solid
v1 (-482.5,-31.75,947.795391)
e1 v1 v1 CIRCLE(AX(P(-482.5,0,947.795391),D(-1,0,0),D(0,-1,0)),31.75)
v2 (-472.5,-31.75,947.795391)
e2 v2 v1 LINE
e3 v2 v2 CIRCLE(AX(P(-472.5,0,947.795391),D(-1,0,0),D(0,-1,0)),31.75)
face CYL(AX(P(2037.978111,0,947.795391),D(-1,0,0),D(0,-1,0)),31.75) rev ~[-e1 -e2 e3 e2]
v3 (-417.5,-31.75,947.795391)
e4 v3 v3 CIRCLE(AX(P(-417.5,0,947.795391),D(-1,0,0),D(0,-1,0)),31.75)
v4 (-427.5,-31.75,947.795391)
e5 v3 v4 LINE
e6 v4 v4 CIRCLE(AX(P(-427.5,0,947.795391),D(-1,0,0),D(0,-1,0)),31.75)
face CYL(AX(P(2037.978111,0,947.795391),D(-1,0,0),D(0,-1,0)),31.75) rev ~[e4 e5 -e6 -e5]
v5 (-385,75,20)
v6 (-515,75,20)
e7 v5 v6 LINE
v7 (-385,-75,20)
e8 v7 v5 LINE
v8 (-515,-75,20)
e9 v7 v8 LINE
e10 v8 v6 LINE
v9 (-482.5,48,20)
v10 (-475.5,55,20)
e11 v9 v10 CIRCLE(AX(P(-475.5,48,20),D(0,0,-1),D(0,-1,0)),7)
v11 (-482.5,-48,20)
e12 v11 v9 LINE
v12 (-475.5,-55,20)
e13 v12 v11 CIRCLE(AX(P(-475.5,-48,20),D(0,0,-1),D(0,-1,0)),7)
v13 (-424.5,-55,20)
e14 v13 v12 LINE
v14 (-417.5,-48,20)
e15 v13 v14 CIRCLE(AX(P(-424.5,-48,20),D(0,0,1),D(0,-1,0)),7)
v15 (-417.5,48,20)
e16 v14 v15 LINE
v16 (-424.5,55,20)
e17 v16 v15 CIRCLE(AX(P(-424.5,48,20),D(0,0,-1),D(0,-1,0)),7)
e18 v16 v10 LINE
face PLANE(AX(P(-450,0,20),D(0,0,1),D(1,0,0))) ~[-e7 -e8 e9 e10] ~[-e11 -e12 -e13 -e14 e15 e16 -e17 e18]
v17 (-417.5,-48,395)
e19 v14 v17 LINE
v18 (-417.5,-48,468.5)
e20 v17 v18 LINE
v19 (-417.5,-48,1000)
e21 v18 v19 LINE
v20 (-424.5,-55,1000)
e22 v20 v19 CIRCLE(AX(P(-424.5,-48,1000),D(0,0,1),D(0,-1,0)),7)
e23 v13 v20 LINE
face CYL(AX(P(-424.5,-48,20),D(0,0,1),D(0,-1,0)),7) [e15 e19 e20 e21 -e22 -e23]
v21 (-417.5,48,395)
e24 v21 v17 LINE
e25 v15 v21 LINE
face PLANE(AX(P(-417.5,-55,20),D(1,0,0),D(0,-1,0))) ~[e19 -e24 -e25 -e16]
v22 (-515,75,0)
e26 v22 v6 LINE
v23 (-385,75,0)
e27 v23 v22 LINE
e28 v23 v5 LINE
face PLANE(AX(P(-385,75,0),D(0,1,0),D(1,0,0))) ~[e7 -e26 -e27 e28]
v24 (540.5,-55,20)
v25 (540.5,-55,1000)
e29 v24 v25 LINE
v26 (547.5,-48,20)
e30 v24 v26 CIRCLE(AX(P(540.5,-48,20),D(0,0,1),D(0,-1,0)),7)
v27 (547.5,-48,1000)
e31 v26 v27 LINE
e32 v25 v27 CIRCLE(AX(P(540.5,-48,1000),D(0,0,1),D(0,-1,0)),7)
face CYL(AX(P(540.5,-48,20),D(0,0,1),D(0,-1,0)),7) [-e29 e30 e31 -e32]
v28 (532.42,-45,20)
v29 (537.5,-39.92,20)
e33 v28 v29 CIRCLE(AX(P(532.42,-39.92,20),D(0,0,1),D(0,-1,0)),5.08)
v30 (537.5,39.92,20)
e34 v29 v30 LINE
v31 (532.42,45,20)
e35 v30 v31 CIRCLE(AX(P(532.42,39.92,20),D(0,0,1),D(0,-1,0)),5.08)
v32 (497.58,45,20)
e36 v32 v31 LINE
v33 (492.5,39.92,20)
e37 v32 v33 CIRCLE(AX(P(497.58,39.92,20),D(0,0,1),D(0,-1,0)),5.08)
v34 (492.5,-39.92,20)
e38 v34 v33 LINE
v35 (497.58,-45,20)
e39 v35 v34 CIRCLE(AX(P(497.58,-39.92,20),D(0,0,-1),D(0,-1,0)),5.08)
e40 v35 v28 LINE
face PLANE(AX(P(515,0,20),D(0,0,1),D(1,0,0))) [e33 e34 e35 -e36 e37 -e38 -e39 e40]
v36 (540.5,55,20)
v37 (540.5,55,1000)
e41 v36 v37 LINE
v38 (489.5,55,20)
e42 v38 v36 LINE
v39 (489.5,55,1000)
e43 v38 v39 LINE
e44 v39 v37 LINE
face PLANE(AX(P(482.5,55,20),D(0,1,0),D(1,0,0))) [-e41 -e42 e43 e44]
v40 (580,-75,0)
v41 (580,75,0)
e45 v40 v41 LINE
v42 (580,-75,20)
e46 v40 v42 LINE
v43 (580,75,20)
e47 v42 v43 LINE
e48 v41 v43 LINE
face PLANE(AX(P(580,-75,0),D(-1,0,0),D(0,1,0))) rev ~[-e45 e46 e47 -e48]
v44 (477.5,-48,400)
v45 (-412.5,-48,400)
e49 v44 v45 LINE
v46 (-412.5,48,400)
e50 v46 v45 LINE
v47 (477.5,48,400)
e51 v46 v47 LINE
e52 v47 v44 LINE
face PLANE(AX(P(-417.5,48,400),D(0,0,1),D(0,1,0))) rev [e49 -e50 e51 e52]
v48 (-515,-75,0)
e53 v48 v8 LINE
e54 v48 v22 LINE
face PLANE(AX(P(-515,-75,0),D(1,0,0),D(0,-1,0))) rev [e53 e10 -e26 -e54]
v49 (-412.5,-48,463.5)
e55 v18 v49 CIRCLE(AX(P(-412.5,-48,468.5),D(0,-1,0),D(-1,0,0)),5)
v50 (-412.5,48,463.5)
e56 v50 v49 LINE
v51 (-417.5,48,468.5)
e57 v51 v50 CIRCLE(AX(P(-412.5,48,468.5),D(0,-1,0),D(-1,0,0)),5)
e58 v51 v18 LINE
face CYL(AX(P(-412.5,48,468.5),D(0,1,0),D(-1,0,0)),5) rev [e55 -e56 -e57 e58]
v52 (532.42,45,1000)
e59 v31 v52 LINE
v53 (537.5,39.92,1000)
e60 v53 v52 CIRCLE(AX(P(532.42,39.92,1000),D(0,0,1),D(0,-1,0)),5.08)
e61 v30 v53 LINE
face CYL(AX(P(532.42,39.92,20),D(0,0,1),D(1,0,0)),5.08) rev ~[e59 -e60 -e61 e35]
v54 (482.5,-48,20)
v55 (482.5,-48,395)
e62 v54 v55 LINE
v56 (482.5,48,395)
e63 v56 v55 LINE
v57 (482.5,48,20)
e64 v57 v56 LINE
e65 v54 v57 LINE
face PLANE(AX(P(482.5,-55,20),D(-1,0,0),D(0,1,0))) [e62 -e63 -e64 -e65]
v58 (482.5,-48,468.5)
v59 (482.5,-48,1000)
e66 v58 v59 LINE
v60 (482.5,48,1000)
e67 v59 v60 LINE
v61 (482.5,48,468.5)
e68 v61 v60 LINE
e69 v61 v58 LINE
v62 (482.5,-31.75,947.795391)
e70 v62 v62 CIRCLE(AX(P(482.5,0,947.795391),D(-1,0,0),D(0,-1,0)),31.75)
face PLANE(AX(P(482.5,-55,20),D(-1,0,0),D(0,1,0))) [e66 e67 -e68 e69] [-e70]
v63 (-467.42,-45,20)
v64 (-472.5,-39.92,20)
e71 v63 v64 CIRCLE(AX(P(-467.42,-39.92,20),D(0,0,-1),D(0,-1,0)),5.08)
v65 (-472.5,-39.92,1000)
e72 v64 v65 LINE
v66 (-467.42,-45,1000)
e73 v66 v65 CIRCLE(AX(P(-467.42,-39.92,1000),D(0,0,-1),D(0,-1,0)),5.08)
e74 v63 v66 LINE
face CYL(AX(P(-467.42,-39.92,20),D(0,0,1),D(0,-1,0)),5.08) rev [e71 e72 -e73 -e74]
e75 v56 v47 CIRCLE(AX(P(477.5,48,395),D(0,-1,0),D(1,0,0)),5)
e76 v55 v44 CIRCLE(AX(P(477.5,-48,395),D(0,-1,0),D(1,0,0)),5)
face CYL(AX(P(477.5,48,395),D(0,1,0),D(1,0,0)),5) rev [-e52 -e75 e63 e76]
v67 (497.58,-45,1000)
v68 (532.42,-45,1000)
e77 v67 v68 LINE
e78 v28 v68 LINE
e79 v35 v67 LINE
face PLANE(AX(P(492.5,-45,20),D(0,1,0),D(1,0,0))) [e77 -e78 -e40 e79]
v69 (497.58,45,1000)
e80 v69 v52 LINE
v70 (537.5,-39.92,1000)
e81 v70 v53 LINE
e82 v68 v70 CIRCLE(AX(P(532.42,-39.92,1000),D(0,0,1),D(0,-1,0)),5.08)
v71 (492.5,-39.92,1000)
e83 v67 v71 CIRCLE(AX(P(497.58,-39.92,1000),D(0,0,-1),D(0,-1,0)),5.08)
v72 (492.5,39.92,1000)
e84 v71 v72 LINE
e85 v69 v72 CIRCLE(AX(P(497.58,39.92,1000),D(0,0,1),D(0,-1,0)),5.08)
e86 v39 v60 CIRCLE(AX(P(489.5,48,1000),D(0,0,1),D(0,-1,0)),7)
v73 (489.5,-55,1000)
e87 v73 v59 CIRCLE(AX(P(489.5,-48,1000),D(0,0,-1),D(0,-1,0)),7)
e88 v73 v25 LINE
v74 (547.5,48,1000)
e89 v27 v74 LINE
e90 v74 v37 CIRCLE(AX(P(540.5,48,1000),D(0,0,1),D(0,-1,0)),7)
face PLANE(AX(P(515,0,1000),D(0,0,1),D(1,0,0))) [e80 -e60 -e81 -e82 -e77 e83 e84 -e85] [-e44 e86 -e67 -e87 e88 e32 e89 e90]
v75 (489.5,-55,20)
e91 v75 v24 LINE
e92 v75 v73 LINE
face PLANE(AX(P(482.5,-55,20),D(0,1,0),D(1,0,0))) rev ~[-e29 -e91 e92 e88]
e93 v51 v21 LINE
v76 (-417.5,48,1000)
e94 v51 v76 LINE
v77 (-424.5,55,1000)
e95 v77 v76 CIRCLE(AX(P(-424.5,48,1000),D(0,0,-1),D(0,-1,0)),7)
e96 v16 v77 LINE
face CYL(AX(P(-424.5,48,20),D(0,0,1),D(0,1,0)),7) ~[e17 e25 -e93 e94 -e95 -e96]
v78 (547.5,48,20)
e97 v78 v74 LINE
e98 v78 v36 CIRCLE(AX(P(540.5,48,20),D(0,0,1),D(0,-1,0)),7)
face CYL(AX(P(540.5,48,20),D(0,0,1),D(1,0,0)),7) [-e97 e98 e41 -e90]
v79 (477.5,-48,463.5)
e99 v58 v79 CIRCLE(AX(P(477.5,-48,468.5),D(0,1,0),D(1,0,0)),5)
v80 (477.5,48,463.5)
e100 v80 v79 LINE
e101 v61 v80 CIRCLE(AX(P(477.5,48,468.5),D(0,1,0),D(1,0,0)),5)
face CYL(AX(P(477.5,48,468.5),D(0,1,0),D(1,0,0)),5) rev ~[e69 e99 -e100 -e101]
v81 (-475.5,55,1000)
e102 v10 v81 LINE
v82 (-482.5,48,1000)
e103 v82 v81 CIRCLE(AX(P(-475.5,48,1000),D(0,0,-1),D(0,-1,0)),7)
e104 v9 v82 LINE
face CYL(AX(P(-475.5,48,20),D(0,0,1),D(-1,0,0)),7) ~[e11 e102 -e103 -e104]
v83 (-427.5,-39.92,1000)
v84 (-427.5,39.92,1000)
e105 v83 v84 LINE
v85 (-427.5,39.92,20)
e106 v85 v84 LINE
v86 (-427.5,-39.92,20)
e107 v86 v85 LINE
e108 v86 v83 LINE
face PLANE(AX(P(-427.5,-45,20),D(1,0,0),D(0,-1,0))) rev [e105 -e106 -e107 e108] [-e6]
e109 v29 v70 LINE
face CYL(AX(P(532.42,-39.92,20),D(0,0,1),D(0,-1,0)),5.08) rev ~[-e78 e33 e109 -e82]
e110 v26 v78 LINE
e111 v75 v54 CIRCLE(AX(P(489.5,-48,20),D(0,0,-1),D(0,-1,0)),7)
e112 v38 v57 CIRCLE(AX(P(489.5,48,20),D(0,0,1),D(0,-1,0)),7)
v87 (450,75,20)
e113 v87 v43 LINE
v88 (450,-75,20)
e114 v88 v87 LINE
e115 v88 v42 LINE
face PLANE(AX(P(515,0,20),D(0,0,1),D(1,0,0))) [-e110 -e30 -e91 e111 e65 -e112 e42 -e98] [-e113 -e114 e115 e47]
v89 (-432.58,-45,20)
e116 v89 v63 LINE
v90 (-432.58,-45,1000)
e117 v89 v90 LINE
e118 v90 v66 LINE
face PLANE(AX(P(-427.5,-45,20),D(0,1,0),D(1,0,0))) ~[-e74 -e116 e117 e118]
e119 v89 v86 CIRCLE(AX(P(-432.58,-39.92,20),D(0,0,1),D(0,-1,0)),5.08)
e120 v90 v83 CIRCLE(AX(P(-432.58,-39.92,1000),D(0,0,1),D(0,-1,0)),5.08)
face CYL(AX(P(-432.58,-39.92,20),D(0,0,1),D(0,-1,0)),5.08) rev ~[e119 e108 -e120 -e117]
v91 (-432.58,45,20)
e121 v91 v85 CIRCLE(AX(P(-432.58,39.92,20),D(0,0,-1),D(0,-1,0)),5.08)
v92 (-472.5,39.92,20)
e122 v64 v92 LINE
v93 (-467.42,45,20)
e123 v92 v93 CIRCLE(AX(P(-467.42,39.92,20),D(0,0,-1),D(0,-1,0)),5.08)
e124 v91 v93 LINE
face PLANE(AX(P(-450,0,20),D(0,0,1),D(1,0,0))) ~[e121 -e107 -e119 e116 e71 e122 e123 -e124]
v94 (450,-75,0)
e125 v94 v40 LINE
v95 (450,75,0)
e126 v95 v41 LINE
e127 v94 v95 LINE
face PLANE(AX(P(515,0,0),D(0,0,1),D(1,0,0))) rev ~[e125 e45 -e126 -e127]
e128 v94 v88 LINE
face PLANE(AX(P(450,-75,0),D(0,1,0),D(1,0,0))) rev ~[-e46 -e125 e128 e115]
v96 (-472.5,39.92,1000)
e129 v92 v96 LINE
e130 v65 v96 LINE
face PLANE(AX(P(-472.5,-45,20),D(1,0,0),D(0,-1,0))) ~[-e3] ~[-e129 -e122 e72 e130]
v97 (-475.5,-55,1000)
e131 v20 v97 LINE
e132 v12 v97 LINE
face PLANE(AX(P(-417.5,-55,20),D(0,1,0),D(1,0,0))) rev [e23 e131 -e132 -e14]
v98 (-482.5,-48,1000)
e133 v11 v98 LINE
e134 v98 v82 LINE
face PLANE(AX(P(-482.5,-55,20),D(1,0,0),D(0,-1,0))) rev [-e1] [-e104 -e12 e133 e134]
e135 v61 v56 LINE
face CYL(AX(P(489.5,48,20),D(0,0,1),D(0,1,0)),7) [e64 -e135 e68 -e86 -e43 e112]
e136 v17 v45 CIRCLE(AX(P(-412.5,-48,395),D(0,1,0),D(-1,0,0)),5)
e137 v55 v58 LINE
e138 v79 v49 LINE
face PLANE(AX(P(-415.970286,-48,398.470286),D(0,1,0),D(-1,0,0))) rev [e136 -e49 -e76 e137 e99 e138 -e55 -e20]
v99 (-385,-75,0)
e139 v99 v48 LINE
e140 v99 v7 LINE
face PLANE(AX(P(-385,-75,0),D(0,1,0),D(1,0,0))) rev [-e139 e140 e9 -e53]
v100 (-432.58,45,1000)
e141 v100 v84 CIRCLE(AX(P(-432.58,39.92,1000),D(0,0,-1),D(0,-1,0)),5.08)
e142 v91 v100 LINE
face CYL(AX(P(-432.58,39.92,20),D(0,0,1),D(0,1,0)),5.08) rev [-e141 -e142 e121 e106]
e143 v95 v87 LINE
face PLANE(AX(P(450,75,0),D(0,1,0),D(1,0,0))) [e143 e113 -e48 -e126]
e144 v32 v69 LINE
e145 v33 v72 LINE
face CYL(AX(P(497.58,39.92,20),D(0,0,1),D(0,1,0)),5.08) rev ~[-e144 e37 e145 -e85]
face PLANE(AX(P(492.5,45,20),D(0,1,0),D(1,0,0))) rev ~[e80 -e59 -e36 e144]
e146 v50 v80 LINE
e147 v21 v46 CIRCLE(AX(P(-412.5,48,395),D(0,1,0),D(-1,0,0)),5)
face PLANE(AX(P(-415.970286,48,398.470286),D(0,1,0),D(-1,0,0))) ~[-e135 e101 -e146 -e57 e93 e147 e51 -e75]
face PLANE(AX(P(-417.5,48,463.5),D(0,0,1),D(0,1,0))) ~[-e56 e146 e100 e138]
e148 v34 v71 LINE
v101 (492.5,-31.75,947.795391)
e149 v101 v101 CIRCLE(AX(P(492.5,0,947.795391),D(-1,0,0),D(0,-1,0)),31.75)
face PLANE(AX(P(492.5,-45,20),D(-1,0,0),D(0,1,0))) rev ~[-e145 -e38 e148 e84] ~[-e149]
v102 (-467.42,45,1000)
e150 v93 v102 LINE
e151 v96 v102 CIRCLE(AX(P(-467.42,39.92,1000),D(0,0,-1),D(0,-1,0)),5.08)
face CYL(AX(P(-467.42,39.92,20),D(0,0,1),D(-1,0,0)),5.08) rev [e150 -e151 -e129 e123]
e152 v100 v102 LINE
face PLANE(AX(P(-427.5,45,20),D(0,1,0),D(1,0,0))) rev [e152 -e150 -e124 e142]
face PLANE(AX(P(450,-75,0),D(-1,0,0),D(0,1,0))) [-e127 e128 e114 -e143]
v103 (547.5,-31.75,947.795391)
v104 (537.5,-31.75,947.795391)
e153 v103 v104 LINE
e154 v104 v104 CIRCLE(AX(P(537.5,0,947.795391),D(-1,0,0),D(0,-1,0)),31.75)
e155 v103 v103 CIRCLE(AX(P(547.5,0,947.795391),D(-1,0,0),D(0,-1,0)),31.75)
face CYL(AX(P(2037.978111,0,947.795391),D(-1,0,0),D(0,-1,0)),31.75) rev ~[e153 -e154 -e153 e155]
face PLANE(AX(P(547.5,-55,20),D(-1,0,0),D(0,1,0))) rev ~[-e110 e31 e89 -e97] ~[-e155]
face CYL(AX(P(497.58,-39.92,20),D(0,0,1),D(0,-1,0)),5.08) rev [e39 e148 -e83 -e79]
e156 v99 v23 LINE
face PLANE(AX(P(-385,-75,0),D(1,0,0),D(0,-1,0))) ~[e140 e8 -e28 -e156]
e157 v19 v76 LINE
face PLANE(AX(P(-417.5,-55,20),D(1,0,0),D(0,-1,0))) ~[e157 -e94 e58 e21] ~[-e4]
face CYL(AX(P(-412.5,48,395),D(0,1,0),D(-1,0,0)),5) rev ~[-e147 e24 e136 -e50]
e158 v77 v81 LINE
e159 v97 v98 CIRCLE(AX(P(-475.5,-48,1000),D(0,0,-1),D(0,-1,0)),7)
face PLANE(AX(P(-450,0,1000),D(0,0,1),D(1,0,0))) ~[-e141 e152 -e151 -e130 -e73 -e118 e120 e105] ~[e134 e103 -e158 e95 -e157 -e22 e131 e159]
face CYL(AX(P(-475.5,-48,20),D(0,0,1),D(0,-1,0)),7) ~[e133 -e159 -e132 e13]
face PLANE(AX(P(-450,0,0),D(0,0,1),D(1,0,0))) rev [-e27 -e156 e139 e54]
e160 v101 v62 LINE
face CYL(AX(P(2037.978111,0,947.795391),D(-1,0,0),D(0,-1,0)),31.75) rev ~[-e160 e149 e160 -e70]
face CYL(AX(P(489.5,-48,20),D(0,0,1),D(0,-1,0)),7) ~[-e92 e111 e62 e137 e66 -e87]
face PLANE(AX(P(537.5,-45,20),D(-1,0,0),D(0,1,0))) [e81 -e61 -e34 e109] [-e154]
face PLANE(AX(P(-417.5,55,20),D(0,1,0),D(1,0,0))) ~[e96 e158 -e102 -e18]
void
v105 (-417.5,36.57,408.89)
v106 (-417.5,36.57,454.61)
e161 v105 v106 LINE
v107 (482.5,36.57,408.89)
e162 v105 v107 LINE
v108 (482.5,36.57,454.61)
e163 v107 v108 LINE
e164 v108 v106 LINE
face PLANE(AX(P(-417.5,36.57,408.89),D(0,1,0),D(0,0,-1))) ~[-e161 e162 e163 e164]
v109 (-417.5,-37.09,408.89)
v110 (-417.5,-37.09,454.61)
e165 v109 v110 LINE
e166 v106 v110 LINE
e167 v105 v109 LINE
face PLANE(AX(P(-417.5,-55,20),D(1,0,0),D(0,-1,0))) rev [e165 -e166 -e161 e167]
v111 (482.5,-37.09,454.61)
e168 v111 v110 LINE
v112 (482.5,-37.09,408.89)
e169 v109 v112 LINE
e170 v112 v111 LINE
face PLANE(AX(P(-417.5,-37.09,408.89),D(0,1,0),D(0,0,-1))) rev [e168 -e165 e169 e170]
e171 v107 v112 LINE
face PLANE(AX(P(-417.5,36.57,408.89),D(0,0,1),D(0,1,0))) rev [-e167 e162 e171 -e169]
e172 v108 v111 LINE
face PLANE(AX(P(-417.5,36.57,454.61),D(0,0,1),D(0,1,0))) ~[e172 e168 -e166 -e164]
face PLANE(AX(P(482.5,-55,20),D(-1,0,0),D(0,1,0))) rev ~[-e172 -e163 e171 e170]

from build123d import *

# Parameters (mm, degrees)
F0_W        = 130
F0_H        = 150
F1_DEPTH    = 20
F2_W        = 65
F2_H        = 110
F2_W_2      = 45
F2_H_2      = 90
F3_DEPTH    = 980
F4_R        = 7
F5_R        = 5.08
F6_W        = 96
F6_H        = 63.5
F6_W_2      = 73.66
F6_H_2      = 45.72
F7_DEPTH    = 450
F8_T1_DEPTH = 96
F9_T1_DEPTH = 96
F13_D       = 63.5


# Not quite as in the source:
# - a fillet or chamfer that OpenCascade refuses, or shapes differently, is made with other operations: its cross-section is extruded or revolved along the edge and cut away or added


with BuildPart() as f1:
    # F0 (on Top) → F1 (new body)
    with BuildSketch(Plane.XY):
        with Locations((515, 0)):
            Rectangle(F0_W, F0_H)
    extrude(amount=F1_DEPTH)

    # F2 (on face) → F3 (join)
    with BuildSketch(Plane.XY.offset(20)):
        with Locations((515, 0)):
            Rectangle(F2_W, F2_H)
        with Locations((515, 0)):
            Rectangle(F2_W_2, F2_H_2, mode=Mode.SUBTRACT)
    extrude(amount=F3_DEPTH)

    # F4
    f4_edges = [f1.edges().sort_by_distance(p)[0] for p in [
        (547.5, -55, 510),
        (482.5, -55, 510),
        (547.5, 55, 510),
        (482.5, 55, 510),
    ]]
    fillet(f4_edges, radius=F4_R)

    # F5
    f5_edges = [f1.edges().sort_by_distance(p)[0] for p in [
        (492.5, 45, 510),
        (492.5, -45, 510),
        (537.5, -45, 510),
        (537.5, 45, 510),
    ]]
    fillet(f5_edges, radius=F5_R)

    # F6 (on face) → F7 (join)
    with BuildSketch(Plane(origin=(482.5, 0, 0), x_dir=(0, -1, 0), z_dir=(-1, 0, 0))):
        with Locations((0, 431.75)):
            Rectangle(F6_W, F6_H)
        with Locations((0.26, 431.75)):
            Rectangle(F6_W_2, F6_H_2, mode=Mode.SUBTRACT)
    extrude(amount=F7_DEPTH)

    # F8: fillet of radius 5 on 1 edges, made by hand

    # F8_s2 → F8_t1 (join)
    with BuildSketch(Plane.XZ.offset(-48)):
        with BuildLine():
            ThreePointArc((482.5, 468.5), (481.0355339059, 464.9644660941), (477.5, 463.5))
            Line((477.5, 463.5), (482.5, 463.5))
            Line((482.5, 463.5), (482.5, 468.5))
        make_face()
    extrude(amount=F8_T1_DEPTH)

    # F9: fillet of radius 5 on 1 edges, made by hand

    # F9_s2 → F9_t1 (join)
    with BuildSketch(Plane.XZ.offset(-48)):
        with BuildLine():
            ThreePointArc((482.5, 395), (481.0355339059, 398.5355339059), (477.5, 400))
            Line((477.5, 400), (482.5, 400))
            Line((482.5, 400), (482.5, 395))
        make_face()
    extrude(amount=F9_T1_DEPTH)

    # F11: F1 across face


with BuildPart() as f1_1:
    add(f1.part)
    add(f1.part.mirror(Plane(origin=(32.5, 0, 0), x_dir=(0, -1, 0), z_dir=(-1, 0, 0))))

    # F13 (through all)
    with Locations(Plane.YZ.offset(547.5)):
        with Locations((0, 947.7953910828)):
            Hole(F13_D / 2)


solid = f1_1.part
